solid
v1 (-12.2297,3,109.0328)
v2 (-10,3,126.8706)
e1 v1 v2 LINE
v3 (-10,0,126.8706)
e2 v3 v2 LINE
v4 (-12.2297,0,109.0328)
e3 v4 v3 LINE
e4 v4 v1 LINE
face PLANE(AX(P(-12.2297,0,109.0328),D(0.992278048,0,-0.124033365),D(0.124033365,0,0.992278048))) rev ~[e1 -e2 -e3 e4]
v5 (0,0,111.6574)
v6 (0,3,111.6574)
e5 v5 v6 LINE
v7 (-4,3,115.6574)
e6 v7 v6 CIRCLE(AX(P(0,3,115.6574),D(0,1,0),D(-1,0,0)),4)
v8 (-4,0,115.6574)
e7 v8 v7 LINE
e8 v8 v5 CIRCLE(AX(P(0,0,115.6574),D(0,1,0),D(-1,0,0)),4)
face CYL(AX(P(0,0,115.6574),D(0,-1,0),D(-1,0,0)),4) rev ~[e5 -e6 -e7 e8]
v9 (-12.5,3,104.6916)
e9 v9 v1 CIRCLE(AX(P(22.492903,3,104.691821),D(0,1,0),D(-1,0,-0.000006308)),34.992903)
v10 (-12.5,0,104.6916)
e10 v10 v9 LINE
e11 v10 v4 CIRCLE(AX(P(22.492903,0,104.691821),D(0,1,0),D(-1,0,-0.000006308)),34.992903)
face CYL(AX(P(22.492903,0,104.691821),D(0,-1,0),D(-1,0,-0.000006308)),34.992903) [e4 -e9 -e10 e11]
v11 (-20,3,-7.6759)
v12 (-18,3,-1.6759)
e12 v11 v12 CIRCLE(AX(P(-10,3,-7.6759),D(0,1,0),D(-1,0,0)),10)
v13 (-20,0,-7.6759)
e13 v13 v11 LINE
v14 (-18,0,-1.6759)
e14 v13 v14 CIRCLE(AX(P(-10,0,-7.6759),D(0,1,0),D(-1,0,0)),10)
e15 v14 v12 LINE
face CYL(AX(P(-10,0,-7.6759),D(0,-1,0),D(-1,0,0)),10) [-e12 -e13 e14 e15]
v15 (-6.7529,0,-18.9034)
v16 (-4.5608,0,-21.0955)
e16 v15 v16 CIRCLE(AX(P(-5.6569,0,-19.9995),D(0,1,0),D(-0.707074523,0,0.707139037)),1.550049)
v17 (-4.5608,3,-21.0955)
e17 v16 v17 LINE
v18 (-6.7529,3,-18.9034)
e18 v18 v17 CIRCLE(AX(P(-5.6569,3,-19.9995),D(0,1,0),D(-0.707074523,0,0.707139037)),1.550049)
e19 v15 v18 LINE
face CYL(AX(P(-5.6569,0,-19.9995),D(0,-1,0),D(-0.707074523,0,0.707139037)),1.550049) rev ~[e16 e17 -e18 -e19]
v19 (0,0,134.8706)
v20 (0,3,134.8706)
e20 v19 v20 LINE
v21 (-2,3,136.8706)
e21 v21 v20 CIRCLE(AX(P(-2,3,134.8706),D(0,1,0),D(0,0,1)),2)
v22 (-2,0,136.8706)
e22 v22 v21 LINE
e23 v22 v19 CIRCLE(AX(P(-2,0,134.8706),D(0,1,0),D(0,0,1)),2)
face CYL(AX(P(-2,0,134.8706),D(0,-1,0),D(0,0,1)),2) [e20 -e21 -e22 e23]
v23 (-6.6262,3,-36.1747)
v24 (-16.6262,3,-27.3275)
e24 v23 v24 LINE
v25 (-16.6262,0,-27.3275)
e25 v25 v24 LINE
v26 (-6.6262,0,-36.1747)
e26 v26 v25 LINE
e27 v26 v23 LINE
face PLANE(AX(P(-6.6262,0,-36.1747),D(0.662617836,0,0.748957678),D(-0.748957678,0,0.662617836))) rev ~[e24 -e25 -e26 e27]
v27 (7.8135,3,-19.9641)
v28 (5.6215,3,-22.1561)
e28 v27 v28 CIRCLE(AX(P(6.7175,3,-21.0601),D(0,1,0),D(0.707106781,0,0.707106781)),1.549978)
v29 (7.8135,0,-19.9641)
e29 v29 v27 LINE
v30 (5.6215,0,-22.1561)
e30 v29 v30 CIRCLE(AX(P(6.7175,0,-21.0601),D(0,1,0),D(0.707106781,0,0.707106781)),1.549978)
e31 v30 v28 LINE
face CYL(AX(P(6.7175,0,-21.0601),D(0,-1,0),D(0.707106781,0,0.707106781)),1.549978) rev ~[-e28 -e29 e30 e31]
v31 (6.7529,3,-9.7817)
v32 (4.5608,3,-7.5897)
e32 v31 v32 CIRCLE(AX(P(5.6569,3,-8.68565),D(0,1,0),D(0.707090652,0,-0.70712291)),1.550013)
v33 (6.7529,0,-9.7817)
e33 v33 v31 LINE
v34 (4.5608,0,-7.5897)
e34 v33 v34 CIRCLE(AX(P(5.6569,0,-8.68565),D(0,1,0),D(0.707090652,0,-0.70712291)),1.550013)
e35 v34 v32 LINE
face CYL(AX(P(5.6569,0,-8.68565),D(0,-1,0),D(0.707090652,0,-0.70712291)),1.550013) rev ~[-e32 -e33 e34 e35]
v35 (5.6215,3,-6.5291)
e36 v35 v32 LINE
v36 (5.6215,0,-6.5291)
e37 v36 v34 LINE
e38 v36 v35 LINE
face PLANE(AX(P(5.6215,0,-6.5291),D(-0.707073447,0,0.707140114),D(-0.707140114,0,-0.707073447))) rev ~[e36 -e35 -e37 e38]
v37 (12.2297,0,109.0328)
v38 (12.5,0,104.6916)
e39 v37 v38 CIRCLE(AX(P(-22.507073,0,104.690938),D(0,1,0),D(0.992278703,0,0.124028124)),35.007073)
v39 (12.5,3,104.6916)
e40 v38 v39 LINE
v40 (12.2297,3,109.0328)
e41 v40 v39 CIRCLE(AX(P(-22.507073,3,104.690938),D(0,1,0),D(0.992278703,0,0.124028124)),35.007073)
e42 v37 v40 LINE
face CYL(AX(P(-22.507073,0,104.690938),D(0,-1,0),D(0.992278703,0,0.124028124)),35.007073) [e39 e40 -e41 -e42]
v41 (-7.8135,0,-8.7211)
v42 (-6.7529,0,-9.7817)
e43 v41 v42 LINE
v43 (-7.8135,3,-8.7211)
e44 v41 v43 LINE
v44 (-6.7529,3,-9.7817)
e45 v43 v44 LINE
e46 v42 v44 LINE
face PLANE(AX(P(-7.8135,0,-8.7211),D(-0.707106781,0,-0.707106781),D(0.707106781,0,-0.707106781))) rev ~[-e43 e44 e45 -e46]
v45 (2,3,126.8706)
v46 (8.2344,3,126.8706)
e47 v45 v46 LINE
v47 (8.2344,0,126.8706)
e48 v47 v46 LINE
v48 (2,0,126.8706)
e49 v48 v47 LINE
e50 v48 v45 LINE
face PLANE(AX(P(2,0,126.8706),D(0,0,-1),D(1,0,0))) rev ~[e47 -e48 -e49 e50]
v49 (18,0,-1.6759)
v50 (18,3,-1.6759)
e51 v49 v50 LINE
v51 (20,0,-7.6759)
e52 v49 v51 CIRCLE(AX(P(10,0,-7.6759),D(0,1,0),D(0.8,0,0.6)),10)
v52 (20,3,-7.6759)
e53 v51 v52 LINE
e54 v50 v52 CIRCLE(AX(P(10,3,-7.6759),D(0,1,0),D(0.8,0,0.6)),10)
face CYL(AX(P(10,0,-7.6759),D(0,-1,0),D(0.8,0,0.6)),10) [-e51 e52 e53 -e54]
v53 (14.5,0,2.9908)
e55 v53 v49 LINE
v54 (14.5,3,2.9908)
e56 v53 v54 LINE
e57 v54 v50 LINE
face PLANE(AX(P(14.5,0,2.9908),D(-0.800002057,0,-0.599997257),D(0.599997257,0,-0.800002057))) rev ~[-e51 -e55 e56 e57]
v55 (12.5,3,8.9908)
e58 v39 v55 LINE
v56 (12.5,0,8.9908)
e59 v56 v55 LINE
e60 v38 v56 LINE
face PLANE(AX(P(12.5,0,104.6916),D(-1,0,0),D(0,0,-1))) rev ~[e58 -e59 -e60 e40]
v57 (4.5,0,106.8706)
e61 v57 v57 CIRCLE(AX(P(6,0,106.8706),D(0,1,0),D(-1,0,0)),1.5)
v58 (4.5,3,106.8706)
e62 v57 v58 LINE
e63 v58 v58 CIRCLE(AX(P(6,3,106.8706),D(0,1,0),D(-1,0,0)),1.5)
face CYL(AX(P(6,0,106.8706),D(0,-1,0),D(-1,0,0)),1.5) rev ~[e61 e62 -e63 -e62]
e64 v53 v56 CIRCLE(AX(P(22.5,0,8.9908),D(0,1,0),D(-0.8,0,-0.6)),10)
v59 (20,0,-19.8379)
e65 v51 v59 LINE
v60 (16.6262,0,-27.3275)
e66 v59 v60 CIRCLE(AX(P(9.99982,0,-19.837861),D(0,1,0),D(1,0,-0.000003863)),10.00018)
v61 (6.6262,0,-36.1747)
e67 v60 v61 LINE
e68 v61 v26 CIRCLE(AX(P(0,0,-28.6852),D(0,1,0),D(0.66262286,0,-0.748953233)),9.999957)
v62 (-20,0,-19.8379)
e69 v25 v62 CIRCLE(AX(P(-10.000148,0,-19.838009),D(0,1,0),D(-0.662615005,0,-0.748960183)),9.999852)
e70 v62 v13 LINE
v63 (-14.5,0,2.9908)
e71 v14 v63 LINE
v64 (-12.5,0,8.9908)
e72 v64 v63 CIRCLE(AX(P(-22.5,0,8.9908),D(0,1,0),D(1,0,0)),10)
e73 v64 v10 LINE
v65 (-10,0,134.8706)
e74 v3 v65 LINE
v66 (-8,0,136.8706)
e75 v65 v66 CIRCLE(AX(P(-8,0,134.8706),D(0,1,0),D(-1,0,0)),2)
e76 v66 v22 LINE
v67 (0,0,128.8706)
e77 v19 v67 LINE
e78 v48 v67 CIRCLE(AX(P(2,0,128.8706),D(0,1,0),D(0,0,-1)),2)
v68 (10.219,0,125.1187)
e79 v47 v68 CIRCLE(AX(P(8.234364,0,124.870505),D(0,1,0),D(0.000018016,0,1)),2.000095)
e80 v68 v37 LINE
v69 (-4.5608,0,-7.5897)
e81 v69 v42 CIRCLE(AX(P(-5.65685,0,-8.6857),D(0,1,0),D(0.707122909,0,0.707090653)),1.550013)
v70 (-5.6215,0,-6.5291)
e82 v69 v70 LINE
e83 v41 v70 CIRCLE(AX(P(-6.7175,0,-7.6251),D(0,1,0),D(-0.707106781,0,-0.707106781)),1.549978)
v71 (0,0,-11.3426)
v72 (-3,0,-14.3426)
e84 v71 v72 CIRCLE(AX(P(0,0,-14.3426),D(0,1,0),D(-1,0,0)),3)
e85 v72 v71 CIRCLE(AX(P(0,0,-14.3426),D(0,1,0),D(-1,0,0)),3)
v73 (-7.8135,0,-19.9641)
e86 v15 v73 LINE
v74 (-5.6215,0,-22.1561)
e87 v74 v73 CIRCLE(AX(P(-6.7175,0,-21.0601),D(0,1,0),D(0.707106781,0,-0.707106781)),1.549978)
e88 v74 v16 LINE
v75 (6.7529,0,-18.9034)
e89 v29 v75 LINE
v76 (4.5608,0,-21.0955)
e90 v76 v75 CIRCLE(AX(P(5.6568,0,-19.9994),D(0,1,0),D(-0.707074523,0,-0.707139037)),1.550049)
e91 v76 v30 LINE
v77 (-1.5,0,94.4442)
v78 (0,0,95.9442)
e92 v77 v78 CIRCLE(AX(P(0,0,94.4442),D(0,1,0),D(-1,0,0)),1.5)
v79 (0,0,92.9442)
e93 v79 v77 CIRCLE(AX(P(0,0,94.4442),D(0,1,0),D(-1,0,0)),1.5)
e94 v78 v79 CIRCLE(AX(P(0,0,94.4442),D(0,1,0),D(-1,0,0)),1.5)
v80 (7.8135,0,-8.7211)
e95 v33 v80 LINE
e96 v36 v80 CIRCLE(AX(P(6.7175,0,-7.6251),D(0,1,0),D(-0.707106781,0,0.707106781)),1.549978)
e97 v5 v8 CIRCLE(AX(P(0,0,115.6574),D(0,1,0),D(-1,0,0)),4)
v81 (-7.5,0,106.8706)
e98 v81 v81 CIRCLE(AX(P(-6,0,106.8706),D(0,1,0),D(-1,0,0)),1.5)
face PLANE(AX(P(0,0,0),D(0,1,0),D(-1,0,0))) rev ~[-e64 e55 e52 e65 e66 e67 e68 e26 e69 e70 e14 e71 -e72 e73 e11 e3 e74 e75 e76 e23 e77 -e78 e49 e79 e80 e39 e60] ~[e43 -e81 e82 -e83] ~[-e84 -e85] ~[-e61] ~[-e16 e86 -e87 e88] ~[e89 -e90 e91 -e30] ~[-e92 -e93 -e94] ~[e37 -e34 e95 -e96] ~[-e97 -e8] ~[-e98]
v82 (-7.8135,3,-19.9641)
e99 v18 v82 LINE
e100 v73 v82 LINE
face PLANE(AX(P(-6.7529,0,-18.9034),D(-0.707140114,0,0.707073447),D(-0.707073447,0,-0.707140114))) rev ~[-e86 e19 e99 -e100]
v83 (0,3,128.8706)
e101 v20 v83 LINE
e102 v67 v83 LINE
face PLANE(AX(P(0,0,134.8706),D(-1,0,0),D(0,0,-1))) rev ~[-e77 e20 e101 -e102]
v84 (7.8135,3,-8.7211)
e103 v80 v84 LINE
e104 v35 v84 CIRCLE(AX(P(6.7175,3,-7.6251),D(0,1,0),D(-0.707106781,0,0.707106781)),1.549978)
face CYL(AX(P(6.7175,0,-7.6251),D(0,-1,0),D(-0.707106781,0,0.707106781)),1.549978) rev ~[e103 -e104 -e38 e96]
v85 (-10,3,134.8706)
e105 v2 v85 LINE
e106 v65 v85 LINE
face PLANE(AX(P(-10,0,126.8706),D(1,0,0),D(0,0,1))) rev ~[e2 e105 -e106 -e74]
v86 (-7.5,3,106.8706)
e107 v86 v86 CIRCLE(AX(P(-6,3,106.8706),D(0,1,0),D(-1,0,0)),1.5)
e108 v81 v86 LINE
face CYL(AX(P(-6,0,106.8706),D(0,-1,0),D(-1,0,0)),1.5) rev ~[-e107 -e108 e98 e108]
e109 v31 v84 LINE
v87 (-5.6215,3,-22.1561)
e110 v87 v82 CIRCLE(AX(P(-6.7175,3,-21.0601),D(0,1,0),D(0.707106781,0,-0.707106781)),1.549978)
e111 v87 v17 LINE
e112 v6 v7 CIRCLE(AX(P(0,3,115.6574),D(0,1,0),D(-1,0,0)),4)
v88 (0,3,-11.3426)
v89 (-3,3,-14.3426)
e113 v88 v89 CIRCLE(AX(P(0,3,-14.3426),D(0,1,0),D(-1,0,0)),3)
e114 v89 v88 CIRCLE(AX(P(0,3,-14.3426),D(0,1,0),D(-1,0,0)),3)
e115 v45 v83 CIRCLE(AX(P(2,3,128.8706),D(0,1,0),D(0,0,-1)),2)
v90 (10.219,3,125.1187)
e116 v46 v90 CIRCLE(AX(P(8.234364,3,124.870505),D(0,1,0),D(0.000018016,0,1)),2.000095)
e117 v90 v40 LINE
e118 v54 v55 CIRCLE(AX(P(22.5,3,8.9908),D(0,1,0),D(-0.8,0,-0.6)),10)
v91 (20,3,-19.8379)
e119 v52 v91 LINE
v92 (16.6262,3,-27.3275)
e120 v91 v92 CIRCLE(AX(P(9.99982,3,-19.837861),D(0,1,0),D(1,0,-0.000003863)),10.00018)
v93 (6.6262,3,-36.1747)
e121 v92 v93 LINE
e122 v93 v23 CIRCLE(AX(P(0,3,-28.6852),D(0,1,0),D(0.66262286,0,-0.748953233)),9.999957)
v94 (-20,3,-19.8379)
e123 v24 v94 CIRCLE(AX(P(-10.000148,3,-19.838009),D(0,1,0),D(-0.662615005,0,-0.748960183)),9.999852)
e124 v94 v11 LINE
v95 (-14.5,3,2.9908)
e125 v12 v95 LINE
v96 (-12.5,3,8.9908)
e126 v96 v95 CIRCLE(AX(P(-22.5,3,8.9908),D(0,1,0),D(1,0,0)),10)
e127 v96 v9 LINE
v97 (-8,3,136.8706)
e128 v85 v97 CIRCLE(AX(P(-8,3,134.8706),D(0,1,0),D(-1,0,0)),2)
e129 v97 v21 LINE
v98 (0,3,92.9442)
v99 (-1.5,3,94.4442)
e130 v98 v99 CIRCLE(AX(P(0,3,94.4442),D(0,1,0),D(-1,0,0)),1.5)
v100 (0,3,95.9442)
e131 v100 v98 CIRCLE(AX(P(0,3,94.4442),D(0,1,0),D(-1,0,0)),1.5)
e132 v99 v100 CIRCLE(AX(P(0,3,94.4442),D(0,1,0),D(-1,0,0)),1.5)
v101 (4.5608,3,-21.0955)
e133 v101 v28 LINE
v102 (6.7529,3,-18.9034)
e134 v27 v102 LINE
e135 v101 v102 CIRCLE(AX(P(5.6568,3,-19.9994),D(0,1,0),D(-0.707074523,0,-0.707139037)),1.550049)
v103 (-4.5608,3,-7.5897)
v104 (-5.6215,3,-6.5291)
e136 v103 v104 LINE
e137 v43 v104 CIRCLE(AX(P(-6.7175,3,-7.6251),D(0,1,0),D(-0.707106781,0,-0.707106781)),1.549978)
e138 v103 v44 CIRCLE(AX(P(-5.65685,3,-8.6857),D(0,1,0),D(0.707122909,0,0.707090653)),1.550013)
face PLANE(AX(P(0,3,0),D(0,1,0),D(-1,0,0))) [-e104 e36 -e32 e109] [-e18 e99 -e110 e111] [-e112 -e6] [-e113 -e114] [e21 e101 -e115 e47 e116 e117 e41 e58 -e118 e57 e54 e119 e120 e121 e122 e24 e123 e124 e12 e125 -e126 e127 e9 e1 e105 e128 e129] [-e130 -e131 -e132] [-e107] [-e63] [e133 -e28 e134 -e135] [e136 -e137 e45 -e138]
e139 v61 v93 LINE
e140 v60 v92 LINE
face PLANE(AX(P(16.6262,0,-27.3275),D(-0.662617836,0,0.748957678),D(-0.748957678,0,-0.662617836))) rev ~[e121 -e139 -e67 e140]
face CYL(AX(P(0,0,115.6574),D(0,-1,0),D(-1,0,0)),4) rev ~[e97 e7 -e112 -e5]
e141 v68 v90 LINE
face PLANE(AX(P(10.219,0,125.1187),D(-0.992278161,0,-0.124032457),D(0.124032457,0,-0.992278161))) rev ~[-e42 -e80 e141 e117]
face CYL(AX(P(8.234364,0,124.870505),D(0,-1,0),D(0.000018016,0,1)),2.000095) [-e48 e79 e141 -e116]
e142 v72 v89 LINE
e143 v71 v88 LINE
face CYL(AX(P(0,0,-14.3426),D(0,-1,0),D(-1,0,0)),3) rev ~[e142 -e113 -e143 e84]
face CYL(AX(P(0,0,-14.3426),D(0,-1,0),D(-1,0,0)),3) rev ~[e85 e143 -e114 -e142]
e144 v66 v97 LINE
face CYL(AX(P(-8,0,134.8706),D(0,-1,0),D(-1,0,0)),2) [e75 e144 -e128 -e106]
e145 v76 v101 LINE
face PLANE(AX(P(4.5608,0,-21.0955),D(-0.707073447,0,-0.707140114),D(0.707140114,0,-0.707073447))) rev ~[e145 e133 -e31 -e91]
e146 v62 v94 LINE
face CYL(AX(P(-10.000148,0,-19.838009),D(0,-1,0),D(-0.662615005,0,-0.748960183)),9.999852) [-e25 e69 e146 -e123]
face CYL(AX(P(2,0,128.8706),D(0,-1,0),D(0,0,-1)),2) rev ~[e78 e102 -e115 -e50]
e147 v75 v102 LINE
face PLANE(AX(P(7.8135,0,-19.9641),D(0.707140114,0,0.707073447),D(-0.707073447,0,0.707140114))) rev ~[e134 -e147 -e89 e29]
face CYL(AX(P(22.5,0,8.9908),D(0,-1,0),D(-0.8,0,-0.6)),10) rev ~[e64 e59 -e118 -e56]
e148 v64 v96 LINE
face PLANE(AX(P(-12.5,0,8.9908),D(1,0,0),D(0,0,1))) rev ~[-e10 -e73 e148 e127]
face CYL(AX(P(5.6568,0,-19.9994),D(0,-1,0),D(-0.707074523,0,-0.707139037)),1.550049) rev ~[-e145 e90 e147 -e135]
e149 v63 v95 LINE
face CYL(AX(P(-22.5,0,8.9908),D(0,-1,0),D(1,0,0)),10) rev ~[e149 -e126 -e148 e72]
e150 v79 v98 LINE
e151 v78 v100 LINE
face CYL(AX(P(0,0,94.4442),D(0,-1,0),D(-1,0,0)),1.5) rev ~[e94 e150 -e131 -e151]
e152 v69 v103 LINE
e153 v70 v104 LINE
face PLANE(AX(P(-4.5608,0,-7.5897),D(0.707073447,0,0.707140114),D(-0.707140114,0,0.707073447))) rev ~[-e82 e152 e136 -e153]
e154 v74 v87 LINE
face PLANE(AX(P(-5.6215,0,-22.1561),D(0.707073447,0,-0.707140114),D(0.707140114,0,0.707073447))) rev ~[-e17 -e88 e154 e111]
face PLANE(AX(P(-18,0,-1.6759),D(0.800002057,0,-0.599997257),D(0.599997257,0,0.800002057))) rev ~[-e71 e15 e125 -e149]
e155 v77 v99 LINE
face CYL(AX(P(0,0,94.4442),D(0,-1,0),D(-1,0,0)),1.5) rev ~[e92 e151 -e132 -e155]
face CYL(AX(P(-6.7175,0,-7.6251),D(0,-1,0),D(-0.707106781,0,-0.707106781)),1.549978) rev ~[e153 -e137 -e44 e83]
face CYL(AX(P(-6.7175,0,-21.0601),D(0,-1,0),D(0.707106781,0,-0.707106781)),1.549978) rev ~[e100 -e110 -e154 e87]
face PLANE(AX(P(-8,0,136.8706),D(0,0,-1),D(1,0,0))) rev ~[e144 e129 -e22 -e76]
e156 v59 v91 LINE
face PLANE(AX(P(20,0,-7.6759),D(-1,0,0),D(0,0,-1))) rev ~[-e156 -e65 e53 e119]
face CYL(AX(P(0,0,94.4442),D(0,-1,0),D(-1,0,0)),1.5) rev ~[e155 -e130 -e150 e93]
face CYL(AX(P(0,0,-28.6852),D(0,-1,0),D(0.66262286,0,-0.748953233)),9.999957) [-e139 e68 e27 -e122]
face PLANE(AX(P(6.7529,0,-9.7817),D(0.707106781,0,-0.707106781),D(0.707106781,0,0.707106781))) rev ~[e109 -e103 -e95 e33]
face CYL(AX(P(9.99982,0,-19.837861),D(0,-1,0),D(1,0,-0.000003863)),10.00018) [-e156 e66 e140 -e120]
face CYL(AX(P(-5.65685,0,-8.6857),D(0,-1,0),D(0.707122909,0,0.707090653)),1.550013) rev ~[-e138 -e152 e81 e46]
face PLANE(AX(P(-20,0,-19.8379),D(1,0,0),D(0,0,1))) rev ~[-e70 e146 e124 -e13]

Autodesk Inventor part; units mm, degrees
ref_plane "YZ Plane" through (0, 0, 0) normal (1, 0, 0) x (0, 1, 0)
ref_plane "XZ Plane" through (0, 0, 0) normal (0, 1, 0) x (-1, 0, 0)
ref_plane "XY Plane" through (0, 0, 0) normal (0, 0, 1) x (1, 0, 0)
sketch "Sketch3" plane through (0, 0, 0) normal (0, 1, 0) x (-1, 0, 0)
  line L0 (6.6262, -36.1747) -> (16.6262, -27.3275)
  arc A0 (16.6262, -27.3275) -> (20, -19.8379) centre (10, -19.8379) ccw
  line L1 (20, -19.8379) -> (20, -7.6759)
  arc A1 (20, -7.6759) -> (18, -1.6759) centre (10, -7.6759) ccw
  line L2 (18, -1.6759) -> (14.5, 2.9908)
  arc A2 (12.5, 8.9908) -> (14.5, 2.9908) centre (22.5, 8.9908) ccw
  arc A3 (-14.5, 2.9908) -> (-12.5, 8.9908) centre (-22.5, 8.9908) ccw
  line L3 (-14.5, 2.9908) -> (-18, -1.6759)
  arc A4 (-18, -1.6759) -> (-20, -7.6759) centre (-10, -7.6759) ccw
  line L4 (-20, -7.6759) -> (-20, -19.8379)
  arc A5 (-20, -19.8379) -> (-16.6262, -27.3275) centre (-10, -19.8379) ccw
  line L5 (-16.6262, -27.3275) -> (-6.6262, -36.1747)
  arc A6 (-6.6262, -36.1747) -> (6.6262, -36.1747) centre (0, -28.6852) ccw
  line L6 (-7.8135, -19.9641) -> (-6.7529, -18.9034)
  arc A7 (-4.5608, -21.0955) -> (-6.7529, -18.9034) centre (-5.6569, -19.9994) ccw
  line L7 (-4.5608, -21.0955) -> (-5.6215, -22.1561)
  arc A8 (-7.8135, -19.9641) -> (-5.6215, -22.1561) centre (-6.7175, -21.0601) ccw
  arc A9 (5.6215, -22.1561) -> (7.8135, -19.9641) centre (6.7175, -21.0601) ccw
  line L8 (5.6215, -22.1561) -> (4.5608, -21.0955)
  arc A10 (6.7529, -18.9034) -> (4.5608, -21.0955) centre (5.6569, -19.9994) ccw
  line L9 (6.7529, -18.9034) -> (7.8135, -19.9641)
  arc A11 (-6.7529, -9.7817) -> (-4.5608, -7.5897) centre (-5.6569, -8.6857) ccw
  line L10 (-6.7529, -9.7817) -> (-7.8135, -8.7211)
  arc A12 (-5.6215, -6.5291) -> (-7.8135, -8.7211) centre (-6.7175, -7.6251) ccw
  line L11 (-5.6215, -6.5291) -> (-4.5608, -7.5897)
  arc A13 (7.8135, -8.7211) -> (5.6215, -6.5291) centre (6.7175, -7.6251) ccw
  line L12 (7.8135, -8.7211) -> (6.7529, -9.7817)
  arc A14 (4.5608, -7.5897) -> (6.7529, -9.7817) centre (5.6569, -8.6857) ccw
  line L13 (4.5608, -7.5897) -> (5.6215, -6.5291)
  circle A15 centre (0, -14.3426) radius 3
  line L14 (-12.5, 8.9908) -> (12.5, 8.9908) construction
  arc A16 (12.5, 104.6916) -> (12.2297, 109.0328) centre (-22.5, 104.6916) ccw
  line L15 (12.2297, 109.0328) -> (10, 126.8706)
  line L16 (10, 126.8706) -> (10, 134.8706)
  arc A17 (10, 134.8706) -> (8, 136.8706) centre (8, 134.8706) ccw
  line L17 (8, 136.8706) -> (2, 136.8706)
  arc A18 (2, 136.8706) -> (0, 134.8706) centre (2, 134.8706) ccw
  line L18 (0, 134.8706) -> (0, 128.8706)
  arc A19 (-2, 126.8706) -> (0, 128.8706) centre (-2, 128.8706) ccw
  line L19 (-2, 126.8706) -> (-8.2344, 126.8706)
  arc A20 (-8.2344, 126.8706) -> (-10.219, 125.1187) centre (-8.2344, 124.8706) ccw
  line L20 (-10.219, 125.1187) -> (-12.2297, 109.0328)
  arc A21 (-12.2297, 109.0328) -> (-12.5, 104.6916) centre (22.5, 104.6916) ccw
  circle A22 centre (6, 106.8706) radius 1.5
  circle A23 centre (-6, 106.8706) radius 1.5
  circle A24 centre (0, 94.4442) radius 1.5
  circle A25 centre (0, 115.6574) radius 4
  line L21 (-12.5, 104.6916) -> (12.5, 104.6916) construction
  line L22 (0, -14.3426) -> (0, 115.6574)
  line L23 (12.5, 8.9908) -> (12.5, 104.6916)
  line L24 (-12.5, 104.6916) -> (-12.5, 8.9908)
  dimension "d4" = 21.2132
  dimension "d7" = 12
  dimension "d8" = 130
extrude "Extrusion1" add sketch "Sketch3" along normal blind 3
sketch "Sketch4" plane through (0, 3, 0) normal (0, 1, 0) x (1, 0, 0)
  circle A0 centre (0, 14.3426) radius 3 construction
  circle A1 centre (0, 14.3426) radius 88.9 construction
  circle A2 centre (0, -115.6574) radius 4 projected
  point P0 (0, 0)
  dimension "d9" = 177.8
  dimension "d10" = 130
sketch "Sketch5" plane through (0, 3, 0) normal (0, 1, 0) x (1, 0, 0)
  line L0 (-12.5, -8.9908) -> (-12.5, -104.6916) projected
  line L1 (12.5, -104.6916) -> (12.5, -8.9908) projected
  arc A0 (-12.5, -8.9908) -> (-14.5, -2.9908) centre (-22.5, -8.9908) ccw projected
  arc A1 (14.5, -2.9908) -> (12.5, -8.9908) centre (22.5, -8.9908) ccw projected
  line L2 (14.5, -2.9908) -> (18, 1.6759) projected
  line L3 (-18, 1.6759) -> (-14.5, -2.9908) projected
  circle A2 centre (0, -94.4442) radius 1.5 construction
  line L4 (0, 0) -> (0, -94.4442) construction
  line L5 (-7.5, 0) -> (-7.5, -94.4442)
  line L6 (7.5, 0) -> (7.5, -94.4442)
  line L7 (-18, 1.6759) -> (-14.5, -2.9908) projected
  line L8 (-14.5, -2.9908) -> (-7.5, -12.3241)
  line L9 (14.5, -2.9908) -> (7.5, -12.3241)
  circle A3 centre (0, 14.3426) radius 88.9 construction
  line L10 (-7.5, -74.2405) -> (-12.5, -81.1047)
  line L11 (7.5, -74.2405) -> (12.5, -80.9071)
  arc A4 (-16.6262, 27.3275) -> (-20, 19.8379) centre (-10, 19.8379) ccw construction
  dimension "d11" = 7.5
  dimension "d12" = 7.5
  dimension "d13" = 143.13
  dimension "d14" = 143.13
  dimension "d15" = 143.93
  dimension "d18" = 10
extrude "Extrusion2" [suppressed]
fillet "Fillet1" [suppressed]
properties part number "Kauri arm short"
